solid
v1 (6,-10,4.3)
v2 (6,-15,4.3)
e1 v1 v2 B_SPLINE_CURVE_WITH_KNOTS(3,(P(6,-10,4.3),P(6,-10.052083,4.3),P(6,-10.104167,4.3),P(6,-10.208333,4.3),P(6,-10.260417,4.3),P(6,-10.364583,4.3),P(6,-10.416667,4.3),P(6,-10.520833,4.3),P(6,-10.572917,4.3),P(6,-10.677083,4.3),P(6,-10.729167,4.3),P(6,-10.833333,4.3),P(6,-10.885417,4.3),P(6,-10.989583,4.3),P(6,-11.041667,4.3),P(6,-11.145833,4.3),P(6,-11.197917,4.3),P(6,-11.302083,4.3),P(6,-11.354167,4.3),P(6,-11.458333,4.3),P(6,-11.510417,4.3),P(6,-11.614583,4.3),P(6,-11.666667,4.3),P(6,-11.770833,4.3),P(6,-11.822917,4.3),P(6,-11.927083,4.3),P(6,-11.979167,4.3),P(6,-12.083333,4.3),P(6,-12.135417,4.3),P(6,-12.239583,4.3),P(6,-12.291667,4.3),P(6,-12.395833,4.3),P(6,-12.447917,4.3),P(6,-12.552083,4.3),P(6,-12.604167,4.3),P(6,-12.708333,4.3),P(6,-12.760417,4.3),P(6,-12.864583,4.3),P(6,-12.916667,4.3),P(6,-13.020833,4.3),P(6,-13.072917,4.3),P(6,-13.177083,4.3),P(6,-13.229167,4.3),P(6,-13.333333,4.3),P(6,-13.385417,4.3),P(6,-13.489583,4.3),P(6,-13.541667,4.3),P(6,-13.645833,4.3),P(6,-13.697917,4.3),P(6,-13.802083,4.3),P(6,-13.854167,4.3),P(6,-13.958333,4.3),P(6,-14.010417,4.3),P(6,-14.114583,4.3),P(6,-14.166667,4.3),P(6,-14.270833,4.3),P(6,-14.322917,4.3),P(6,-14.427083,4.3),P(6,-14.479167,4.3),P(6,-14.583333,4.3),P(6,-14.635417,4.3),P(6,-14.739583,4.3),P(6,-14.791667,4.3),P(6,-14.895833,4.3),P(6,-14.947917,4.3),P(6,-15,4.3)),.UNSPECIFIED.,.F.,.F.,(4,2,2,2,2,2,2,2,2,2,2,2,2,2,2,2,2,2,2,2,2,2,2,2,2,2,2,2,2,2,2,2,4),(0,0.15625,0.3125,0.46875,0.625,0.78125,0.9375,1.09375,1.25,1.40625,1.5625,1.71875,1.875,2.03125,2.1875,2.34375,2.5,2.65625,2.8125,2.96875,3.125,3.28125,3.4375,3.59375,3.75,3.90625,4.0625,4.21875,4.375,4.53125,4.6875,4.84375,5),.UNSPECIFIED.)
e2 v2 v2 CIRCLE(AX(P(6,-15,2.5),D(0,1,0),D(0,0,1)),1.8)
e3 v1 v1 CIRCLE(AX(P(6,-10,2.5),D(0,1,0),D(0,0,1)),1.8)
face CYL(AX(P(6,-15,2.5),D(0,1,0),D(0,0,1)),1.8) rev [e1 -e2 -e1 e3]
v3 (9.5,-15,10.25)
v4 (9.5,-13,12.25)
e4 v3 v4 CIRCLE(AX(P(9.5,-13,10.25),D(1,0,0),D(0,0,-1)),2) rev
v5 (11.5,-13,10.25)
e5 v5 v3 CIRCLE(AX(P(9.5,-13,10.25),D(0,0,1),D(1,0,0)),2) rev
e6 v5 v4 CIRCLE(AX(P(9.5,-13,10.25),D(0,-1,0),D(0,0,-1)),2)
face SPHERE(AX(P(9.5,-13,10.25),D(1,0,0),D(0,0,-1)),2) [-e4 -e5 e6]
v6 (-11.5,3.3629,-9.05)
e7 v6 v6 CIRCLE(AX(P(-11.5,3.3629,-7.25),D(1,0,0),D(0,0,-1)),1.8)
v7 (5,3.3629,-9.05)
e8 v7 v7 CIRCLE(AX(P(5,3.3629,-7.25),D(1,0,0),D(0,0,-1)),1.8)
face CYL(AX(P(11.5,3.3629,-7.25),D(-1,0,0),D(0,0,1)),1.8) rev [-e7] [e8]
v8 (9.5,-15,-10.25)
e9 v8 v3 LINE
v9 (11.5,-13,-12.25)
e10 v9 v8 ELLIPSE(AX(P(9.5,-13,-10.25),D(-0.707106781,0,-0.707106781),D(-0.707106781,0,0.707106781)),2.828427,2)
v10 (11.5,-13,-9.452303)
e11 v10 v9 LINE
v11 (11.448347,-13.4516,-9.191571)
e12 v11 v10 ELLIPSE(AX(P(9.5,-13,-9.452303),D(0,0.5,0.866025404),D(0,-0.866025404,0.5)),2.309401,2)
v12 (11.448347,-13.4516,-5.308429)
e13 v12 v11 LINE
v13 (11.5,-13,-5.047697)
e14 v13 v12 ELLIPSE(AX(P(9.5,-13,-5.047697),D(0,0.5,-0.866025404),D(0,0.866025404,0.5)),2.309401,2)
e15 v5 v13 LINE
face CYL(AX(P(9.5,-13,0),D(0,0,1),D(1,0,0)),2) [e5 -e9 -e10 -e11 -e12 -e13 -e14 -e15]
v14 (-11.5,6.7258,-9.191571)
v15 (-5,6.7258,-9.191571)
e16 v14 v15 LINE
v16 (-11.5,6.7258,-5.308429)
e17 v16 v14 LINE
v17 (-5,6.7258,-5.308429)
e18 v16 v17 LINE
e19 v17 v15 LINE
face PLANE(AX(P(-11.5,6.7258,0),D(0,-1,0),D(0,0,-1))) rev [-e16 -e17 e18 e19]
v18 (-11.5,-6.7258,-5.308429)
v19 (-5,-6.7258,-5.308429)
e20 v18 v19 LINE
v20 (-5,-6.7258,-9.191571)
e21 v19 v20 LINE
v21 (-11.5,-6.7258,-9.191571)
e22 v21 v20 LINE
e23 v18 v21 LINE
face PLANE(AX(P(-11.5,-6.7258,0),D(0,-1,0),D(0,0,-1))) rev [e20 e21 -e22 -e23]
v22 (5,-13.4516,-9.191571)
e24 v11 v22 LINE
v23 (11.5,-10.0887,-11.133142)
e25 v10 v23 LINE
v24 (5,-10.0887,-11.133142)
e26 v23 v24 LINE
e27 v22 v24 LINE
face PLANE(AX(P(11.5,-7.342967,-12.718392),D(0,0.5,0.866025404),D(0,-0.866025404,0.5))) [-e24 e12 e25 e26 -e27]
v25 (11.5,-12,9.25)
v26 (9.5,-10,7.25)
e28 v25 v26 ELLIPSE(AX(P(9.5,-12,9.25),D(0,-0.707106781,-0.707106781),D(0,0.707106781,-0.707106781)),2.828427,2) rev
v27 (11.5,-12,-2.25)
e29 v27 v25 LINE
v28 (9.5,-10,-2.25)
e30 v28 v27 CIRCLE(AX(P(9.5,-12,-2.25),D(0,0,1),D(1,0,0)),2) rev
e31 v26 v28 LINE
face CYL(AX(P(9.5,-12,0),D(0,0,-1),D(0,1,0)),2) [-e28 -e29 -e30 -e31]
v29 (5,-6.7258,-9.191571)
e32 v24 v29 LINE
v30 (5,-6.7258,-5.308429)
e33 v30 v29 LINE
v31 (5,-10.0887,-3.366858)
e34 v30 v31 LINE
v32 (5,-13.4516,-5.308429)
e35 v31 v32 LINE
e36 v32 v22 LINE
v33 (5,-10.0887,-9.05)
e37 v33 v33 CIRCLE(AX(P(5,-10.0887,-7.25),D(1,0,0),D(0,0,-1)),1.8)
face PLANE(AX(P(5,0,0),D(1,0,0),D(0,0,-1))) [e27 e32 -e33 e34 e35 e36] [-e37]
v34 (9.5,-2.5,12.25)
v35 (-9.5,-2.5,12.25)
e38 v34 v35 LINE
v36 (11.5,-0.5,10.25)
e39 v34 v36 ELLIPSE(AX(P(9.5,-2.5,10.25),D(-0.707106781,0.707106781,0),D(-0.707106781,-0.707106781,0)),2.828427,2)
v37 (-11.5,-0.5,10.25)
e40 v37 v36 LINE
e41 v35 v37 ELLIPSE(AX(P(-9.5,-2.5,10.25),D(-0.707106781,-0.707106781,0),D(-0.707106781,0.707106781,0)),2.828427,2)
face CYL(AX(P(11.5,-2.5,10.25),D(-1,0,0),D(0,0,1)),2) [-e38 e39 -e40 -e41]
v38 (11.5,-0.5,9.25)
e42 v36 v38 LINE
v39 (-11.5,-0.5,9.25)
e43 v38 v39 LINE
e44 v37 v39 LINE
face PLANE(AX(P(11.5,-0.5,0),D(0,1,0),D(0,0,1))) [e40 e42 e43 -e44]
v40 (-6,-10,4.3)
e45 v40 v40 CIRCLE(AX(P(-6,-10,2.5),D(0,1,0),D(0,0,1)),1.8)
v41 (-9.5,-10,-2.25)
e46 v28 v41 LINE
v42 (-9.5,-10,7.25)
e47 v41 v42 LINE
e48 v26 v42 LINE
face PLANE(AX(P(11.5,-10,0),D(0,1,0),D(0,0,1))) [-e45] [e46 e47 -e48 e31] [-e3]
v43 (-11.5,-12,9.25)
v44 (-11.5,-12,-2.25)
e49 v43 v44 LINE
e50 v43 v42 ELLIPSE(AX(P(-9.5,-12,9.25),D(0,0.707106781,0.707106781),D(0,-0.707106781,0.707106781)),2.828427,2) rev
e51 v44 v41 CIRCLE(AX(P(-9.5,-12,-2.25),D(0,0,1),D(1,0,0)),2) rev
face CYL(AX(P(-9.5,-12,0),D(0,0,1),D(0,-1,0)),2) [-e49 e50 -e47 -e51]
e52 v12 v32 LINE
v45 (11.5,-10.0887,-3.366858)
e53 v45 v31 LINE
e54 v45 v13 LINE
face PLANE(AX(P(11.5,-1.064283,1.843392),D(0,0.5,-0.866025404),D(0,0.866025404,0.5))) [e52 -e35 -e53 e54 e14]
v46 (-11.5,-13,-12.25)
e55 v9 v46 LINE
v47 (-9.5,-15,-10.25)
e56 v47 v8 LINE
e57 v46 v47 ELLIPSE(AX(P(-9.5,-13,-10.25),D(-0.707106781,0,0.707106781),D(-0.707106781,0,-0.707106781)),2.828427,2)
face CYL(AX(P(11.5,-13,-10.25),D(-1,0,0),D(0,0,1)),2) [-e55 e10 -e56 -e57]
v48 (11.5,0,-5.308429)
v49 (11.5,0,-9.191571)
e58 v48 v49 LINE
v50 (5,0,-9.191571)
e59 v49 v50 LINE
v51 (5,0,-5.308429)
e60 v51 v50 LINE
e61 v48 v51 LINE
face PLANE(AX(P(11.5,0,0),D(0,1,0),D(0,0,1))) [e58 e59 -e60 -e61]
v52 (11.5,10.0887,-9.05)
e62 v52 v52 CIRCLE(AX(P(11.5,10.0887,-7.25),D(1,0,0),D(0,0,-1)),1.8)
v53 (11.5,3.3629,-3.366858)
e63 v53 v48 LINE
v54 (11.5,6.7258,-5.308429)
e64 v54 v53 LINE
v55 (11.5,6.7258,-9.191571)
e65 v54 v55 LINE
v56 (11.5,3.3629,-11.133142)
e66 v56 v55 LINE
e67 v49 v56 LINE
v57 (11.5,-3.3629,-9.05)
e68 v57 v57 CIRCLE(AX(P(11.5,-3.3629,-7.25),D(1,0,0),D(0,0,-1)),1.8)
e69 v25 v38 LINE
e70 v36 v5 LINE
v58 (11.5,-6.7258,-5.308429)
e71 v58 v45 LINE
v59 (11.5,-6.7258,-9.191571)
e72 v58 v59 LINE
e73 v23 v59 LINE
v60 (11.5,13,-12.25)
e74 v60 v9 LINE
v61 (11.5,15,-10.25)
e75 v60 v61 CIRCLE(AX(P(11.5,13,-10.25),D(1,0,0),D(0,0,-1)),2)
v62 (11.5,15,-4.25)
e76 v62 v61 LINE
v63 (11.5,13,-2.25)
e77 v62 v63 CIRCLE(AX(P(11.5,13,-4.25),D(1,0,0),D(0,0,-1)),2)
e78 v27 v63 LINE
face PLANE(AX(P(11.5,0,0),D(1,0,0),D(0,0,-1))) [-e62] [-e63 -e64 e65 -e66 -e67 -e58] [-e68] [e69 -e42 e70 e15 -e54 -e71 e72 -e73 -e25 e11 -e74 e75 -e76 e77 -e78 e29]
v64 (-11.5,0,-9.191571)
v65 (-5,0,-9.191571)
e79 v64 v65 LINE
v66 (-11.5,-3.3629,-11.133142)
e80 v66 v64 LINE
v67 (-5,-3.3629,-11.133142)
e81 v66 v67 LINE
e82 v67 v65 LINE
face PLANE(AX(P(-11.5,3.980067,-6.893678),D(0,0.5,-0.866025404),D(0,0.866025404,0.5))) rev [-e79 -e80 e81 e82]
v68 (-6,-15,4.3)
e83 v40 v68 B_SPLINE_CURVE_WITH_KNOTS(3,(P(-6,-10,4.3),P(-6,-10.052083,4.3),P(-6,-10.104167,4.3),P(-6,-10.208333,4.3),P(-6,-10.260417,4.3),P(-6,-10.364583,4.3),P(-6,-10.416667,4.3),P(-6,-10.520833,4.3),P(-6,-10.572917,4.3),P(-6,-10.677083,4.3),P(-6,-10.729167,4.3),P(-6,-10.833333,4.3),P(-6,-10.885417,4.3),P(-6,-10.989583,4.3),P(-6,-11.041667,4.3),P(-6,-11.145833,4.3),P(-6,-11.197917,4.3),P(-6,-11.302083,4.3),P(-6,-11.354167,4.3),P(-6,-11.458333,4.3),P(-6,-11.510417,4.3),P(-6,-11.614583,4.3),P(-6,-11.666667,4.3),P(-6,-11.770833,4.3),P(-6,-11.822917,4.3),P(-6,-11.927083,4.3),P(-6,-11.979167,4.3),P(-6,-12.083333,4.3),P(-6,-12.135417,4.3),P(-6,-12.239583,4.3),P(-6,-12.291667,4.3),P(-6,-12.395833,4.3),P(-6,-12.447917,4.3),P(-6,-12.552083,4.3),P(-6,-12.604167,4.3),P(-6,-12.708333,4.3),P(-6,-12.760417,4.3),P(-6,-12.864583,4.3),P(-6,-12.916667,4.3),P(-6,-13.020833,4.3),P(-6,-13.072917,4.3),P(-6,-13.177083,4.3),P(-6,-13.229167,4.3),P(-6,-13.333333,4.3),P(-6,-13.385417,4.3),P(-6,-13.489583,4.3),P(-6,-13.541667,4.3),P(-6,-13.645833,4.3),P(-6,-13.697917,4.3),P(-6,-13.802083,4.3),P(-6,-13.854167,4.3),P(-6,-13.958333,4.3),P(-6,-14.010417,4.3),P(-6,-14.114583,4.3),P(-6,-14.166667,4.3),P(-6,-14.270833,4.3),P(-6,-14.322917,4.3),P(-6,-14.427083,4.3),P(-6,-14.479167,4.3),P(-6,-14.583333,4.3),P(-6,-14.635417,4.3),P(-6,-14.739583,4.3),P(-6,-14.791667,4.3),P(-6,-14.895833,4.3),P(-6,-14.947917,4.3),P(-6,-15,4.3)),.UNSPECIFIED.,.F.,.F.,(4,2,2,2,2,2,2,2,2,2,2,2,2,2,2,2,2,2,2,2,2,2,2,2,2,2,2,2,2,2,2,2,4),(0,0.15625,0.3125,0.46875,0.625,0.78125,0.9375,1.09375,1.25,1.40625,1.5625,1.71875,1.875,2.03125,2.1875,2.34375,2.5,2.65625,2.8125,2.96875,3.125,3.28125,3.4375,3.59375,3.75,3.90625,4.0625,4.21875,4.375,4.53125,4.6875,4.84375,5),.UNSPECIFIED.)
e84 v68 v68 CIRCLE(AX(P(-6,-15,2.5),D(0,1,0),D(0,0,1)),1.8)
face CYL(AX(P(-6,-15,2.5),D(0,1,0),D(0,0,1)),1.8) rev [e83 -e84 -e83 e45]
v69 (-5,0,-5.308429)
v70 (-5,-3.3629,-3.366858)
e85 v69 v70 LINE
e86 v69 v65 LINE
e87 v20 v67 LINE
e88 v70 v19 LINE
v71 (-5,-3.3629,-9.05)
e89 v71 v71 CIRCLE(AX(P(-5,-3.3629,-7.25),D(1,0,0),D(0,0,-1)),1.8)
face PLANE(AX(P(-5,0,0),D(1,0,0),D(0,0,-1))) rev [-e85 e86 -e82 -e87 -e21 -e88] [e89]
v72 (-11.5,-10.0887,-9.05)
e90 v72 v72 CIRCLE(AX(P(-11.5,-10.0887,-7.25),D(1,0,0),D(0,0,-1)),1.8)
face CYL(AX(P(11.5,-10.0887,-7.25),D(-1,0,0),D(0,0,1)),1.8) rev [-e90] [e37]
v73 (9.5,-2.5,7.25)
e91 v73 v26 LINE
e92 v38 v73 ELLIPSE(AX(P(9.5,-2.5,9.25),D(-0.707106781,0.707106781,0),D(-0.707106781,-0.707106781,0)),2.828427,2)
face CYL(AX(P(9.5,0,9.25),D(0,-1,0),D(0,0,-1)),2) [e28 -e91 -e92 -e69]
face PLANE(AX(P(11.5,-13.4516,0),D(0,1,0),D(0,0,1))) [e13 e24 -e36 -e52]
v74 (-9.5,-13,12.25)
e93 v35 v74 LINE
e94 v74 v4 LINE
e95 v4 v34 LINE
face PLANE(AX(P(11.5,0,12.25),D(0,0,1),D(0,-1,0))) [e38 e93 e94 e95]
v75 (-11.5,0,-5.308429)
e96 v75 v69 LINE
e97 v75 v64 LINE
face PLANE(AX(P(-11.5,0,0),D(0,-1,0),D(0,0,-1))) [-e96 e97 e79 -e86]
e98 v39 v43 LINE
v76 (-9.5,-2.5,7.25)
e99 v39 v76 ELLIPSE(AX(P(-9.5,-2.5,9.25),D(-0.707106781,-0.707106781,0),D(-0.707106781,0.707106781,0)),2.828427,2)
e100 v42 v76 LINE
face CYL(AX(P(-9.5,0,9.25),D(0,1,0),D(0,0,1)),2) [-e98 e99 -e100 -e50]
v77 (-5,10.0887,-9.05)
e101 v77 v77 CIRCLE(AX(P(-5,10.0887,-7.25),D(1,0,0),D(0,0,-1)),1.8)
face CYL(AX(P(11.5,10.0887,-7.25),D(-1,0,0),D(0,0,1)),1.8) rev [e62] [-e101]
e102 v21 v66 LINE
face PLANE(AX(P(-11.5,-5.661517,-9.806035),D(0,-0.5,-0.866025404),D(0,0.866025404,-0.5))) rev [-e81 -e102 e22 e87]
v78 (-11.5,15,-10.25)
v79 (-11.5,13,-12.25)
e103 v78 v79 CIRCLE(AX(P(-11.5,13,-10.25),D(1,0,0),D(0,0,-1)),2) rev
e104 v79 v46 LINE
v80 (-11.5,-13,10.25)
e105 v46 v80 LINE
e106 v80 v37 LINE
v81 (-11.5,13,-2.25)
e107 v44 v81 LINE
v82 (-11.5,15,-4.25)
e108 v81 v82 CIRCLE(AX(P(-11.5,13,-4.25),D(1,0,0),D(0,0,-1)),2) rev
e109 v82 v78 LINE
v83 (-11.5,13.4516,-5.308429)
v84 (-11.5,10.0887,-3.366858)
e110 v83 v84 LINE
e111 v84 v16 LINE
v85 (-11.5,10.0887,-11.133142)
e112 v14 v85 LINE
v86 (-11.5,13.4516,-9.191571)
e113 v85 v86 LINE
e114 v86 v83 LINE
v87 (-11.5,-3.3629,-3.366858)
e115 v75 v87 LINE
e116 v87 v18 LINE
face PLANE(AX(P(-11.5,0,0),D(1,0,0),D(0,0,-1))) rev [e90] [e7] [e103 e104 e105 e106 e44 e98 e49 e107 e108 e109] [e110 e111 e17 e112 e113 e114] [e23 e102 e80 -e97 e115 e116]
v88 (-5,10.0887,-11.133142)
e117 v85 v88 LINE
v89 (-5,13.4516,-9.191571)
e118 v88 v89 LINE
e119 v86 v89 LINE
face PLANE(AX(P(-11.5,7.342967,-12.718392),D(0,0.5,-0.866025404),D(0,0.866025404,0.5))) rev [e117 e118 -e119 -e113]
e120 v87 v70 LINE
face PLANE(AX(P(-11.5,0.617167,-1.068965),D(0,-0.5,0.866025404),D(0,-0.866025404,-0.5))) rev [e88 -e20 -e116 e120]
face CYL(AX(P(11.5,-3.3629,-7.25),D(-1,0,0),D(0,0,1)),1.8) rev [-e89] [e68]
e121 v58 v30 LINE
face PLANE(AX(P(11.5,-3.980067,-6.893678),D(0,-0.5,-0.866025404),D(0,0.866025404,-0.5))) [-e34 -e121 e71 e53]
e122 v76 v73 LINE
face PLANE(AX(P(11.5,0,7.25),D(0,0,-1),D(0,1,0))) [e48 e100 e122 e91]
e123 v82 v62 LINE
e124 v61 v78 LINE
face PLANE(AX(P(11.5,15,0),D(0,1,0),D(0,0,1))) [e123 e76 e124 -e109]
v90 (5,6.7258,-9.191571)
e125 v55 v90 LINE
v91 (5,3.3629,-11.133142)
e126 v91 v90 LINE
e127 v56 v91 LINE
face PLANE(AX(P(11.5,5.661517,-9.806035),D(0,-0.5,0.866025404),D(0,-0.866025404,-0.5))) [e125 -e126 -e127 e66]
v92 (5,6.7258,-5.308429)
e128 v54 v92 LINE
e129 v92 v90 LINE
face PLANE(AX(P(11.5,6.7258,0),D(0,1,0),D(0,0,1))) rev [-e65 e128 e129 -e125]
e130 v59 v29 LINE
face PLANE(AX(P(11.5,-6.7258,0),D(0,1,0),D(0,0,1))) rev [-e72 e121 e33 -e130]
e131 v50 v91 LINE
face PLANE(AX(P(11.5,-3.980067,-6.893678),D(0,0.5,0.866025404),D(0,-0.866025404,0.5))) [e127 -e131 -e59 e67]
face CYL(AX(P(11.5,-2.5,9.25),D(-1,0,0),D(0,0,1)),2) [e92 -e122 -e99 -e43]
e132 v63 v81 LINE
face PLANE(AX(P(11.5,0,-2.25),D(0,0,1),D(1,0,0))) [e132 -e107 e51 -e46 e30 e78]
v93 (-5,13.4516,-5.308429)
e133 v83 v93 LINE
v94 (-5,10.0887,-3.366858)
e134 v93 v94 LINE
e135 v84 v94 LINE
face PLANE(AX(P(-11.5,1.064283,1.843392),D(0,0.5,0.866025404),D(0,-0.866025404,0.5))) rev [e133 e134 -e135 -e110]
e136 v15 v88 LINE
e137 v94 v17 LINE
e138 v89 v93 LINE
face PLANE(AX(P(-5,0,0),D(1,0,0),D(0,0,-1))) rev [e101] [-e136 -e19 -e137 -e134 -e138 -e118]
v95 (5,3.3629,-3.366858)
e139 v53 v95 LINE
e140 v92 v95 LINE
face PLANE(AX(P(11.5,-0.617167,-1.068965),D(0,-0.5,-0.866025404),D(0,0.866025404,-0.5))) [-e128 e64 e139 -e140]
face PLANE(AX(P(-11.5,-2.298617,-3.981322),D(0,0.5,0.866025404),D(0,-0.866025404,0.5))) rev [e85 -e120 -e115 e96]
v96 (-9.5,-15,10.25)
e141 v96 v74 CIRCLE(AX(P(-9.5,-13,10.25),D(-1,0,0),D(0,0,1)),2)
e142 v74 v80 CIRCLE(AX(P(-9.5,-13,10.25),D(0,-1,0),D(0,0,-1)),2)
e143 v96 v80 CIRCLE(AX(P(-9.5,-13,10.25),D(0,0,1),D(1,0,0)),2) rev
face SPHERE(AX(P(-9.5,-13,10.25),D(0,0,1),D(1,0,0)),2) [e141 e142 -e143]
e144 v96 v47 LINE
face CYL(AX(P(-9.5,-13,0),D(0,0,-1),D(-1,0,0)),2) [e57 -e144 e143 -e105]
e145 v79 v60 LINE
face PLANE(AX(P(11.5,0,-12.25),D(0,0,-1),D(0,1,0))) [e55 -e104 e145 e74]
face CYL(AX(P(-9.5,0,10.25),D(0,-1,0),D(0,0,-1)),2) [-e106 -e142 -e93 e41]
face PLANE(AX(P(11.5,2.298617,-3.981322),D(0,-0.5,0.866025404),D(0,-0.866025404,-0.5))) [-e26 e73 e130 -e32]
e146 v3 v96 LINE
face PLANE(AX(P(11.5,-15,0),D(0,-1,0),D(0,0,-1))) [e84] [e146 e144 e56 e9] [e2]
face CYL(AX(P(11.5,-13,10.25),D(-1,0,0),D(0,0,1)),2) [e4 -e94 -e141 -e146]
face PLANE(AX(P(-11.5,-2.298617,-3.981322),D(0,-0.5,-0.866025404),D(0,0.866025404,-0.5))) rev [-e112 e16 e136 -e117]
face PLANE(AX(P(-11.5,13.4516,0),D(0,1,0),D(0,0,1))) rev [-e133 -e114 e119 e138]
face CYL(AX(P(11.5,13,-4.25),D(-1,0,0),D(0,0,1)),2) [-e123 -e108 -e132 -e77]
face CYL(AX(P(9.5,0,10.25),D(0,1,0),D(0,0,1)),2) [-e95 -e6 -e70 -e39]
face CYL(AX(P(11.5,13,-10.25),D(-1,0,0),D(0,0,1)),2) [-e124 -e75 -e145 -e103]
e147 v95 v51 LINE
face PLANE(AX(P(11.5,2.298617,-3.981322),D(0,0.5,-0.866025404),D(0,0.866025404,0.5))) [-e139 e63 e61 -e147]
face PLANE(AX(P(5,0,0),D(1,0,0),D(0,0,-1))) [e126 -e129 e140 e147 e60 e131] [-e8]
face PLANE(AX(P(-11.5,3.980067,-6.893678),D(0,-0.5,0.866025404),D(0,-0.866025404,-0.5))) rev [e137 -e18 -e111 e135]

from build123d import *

# Parameters (mm, degrees)
SKETCH1_R               = 1.8
BOSS_EXTRUDE1_DEPTH     = 11.5
CUT_EXTRUDE1_START      = -5
SKETCH1_3_R             = 1.8
CUT_EXTRUDE1_DEPTH      = 18.523598736
CUT_EXTRUDE2_START      = 5
SKETCH1_4_R             = 1.8
CUT_EXTRUDE2_DEPTH      = 18.523598736
CUT_EXTRUDE3_DEPTH      = 23.523598736
CUT_EXTRUDE3_DEPTH_BACK = 23.523598736
SKETCH2_R               = 1.8
FILLET1_R               = 2


with BuildPart() as part:
    # Sketch1 → Boss-Extrude1 (new, symmetric)
    with BuildSketch(Plane(origin=(0, 0, 0), x_dir=(0, 0, -1), z_dir=(1, 0, 0))):
        Polygon((-12.25, -0.5), (-7.25, -0.5), (-7.25, -10), (2.25, -10), (2.25, 15), (12.25, 15), (12.25, -15), (-12.25, -15), align=None)
        with Locations((7.25, 10.0887)):
            Circle(SKETCH1_R, mode=Mode.SUBTRACT)
        with Locations((7.25, 3.3629)):
            Circle(SKETCH1_R, mode=Mode.SUBTRACT)
        with Locations((7.25, -3.3629)):
            Circle(SKETCH1_R, mode=Mode.SUBTRACT)
        with Locations((7.25, -10.0887)):
            Circle(SKETCH1_R, mode=Mode.SUBTRACT)
    extrude(amount=BOSS_EXTRUDE1_DEPTH, both=True)

    # Sketch1<3> → Cut-Extrude1 (cut, through all)
    # profile 1 of 2: a face of its own
    with BuildSketch(Plane(origin=(0, 0, 0), x_dir=(0, 0, -1), z_dir=(1, 0, 0)).offset(CUT_EXTRUDE1_START)):
        Polygon((9.19157122, 13.4516), (5.30842878, 13.4516), (3.366857559, 10.0887), (5.30842878, 6.7258), (9.19157122, 6.7258), (11.133142441, 10.0887), align=None)
        with Locations((7.25, 10.0887)):
            Circle(SKETCH1_3_R, mode=Mode.SUBTRACT)
    # profile 2 of 2: a face of its own
    with BuildSketch(Plane(origin=(0, 0, 0), x_dir=(0, 0, -1), z_dir=(1, 0, 0)).offset(CUT_EXTRUDE1_START)):
        Polygon((5.30842878, 0), (9.19157122, 0), (11.133142441, -3.3629), (9.19157122, -6.7258), (5.30842878, -6.7258), (3.366857559, -3.3629), align=None)
        with Locations((7.25, -3.3629)):
            Circle(SKETCH1_3_R, mode=Mode.SUBTRACT)
    extrude(amount=-CUT_EXTRUDE1_DEPTH, mode=Mode.SUBTRACT)

    # Sketch1<4> → Cut-Extrude2 (cut, through all)
    # profile 1 of 2: a face of its own
    with BuildSketch(Plane(origin=(0, 0, 0), x_dir=(0, 0, -1), z_dir=(1, 0, 0)).offset(CUT_EXTRUDE2_START)):
        Polygon((5.30842878, 6.7258), (9.19157122, 6.7258), (11.133142441, 3.3629), (9.19157122, 0), (5.30842878, 0), (3.366857559, 3.3629), align=None)
        with Locations((7.25, 3.3629)):
            Circle(SKETCH1_4_R, mode=Mode.SUBTRACT)
    # profile 2 of 2: a face of its own
    with BuildSketch(Plane(origin=(0, 0, 0), x_dir=(0, 0, -1), z_dir=(1, 0, 0)).offset(CUT_EXTRUDE2_START)):
        Polygon((5.30842878, -6.7258), (9.19157122, -6.7258), (11.133142441, -10.0887), (9.19157122, -13.4516), (5.30842878, -13.4516), (3.366857559, -10.0887), align=None)
        with Locations((7.25, -10.0887)):
            Circle(SKETCH1_4_R, mode=Mode.SUBTRACT)
    extrude(amount=CUT_EXTRUDE2_DEPTH, mode=Mode.SUBTRACT)

    # Sketch2 → Cut-Extrude3 (cut, two sides: drawn at the far end of the back side and taken through both)
    with BuildSketch(Plane(origin=(0, 0, 0), x_dir=(1, 0, 0), z_dir=(0, 1, 0)).offset(-CUT_EXTRUDE3_DEPTH_BACK)):
        with Locations(Location((-6, -2.5, 0), (0, 0, 270))):
            Circle(SKETCH2_R)
        with Locations(Location((6, -2.5, 0), (0, 0, 270))):
            Circle(SKETCH2_R)
    extrude(amount=CUT_EXTRUDE3_DEPTH + CUT_EXTRUDE3_DEPTH_BACK, mode=Mode.SUBTRACT)

    # Fillet1
    # the kernel refuses this fillet: 2 mm, written as the material it takes off along each edge
    with BuildSketch(Plane(origin=(-9.5, -13, 10.25), x_dir=(-1, 0, 0), z_dir=(0, 0, 1))) as fillet1_piece_1_section:
        Polygon((0, 0), (FILLET1_R * 1.02, 0), (FILLET1_R * 1.02, FILLET1_R * 1.02), (0, FILLET1_R * 1.02), align=None)
    fillet1_piece_1 = extrude(amount=FILLET1_R * 1.02, mode=Mode.PRIVATE)
    fillet1_piece_1 = fillet1_piece_1 - Plane(origin=(-9.5, -13, 10.25), x_dir=(0.7071067811865475, 0.7071067811865475, 0), z_dir=(0, 0, 1)) * Sphere(FILLET1_R, mode=Mode.PRIVATE)
    add(fillet1_piece_1, mode=Mode.SUBTRACT)
    with BuildSketch(Plane(origin=(9.5, -13, 10.25), x_dir=(1, 0, 0), z_dir=(0, 0, 1))) as fillet1_piece_2_section:
        Polygon((0, 0), (FILLET1_R * 1.02, 0), (FILLET1_R * 1.02, -FILLET1_R * 1.02), (0, -FILLET1_R * 1.02), align=None)
    fillet1_piece_2 = extrude(amount=FILLET1_R * 1.02, mode=Mode.PRIVATE)
    fillet1_piece_2 = fillet1_piece_2 - Plane(origin=(9.5, -13, 10.25), x_dir=(-0.7071067811865475, 0.7071067811865475, 0), z_dir=(0, 0, 1)) * Sphere(FILLET1_R, mode=Mode.PRIVATE)
    add(fillet1_piece_2, mode=Mode.SUBTRACT)
    with BuildSketch(Plane(origin=(-11.5, -10, 7.25), x_dir=(0, -1, 0), z_dir=(0, 0, -1)), Plane(origin=(-11.5, -0.5, 7.25), x_dir=(0, 0, 1), z_dir=(0, -1, 0)), Plane(origin=(11.5, -0.5, 7.25), x_dir=(-1, 0, 0), z_dir=(0, -1, 0))) as fillet1_piece_3:
        with BuildLine():
            CenterArc((FILLET1_R, -FILLET1_R), FILLET1_R, 90, 90)
            Line((0, -FILLET1_R), (-FILLET1_R * 0.02, -FILLET1_R))
            Line((-FILLET1_R * 0.02, -FILLET1_R), (-FILLET1_R * 0.02, FILLET1_R * 0.02))
            Line((-FILLET1_R * 0.02, FILLET1_R * 0.02), (FILLET1_R, FILLET1_R * 0.02))
            Line((FILLET1_R, FILLET1_R * 0.02), (FILLET1_R, 0))
        make_face()
    extrude(amount=9.5, mode=Mode.SUBTRACT)
    with BuildSketch(Plane(origin=(11.5, -10, 7.25), x_dir=(0, -1, 0), z_dir=(0, 0, -1))) as fillet1_piece_4:
        with BuildLine():
            CenterArc((FILLET1_R, FILLET1_R), FILLET1_R, 180, 90)
            Line((0, FILLET1_R), (-FILLET1_R * 0.02, FILLET1_R))
            Line((-FILLET1_R * 0.02, FILLET1_R), (-FILLET1_R * 0.02, -FILLET1_R * 0.02))
            Line((-FILLET1_R * 0.02, -FILLET1_R * 0.02), (FILLET1_R, -FILLET1_R * 0.02))
            Line((FILLET1_R, -FILLET1_R * 0.02), (FILLET1_R, 0))
        make_face()
    extrude(amount=9.5, mode=Mode.SUBTRACT)
    with BuildSketch(Plane(origin=(-11.5, -15, -12.25), x_dir=(0, 1, 0), z_dir=(0, 0, 1))) as fillet1_piece_5:
        with BuildLine():
            CenterArc((FILLET1_R, -FILLET1_R), FILLET1_R, 90, 90)
            Line((0, -FILLET1_R), (-FILLET1_R * 0.02, -FILLET1_R))
            Line((-FILLET1_R * 0.02, -FILLET1_R), (-FILLET1_R * 0.02, FILLET1_R * 0.02))
            Line((-FILLET1_R * 0.02, FILLET1_R * 0.02), (FILLET1_R, FILLET1_R * 0.02))
            Line((FILLET1_R, FILLET1_R * 0.02), (FILLET1_R, 0))
        make_face()
    extrude(amount=22.5, mode=Mode.SUBTRACT)
    with BuildSketch(Plane(origin=(11.5, -15, -12.25), x_dir=(0, 1, 0), z_dir=(0, 0, 1))) as fillet1_piece_6:
        with BuildLine():
            CenterArc((FILLET1_R, FILLET1_R), FILLET1_R, 180, 90)
            Line((0, FILLET1_R), (-FILLET1_R * 0.02, FILLET1_R))
            Line((-FILLET1_R * 0.02, FILLET1_R), (-FILLET1_R * 0.02, -FILLET1_R * 0.02))
            Line((-FILLET1_R * 0.02, -FILLET1_R * 0.02), (FILLET1_R, -FILLET1_R * 0.02))
            Line((FILLET1_R, -FILLET1_R * 0.02), (FILLET1_R, 0))
        make_face()
    extrude(amount=22.5, mode=Mode.SUBTRACT)
    with BuildSketch(Plane(origin=(-11.5, -13, 12.25), x_dir=(1, 0, 0), z_dir=(0, 1, 0))) as fillet1_piece_7:
        with BuildLine():
            CenterArc((FILLET1_R, FILLET1_R), FILLET1_R, 180, 90)
            Line((0, FILLET1_R), (-FILLET1_R * 0.02, FILLET1_R))
            Line((-FILLET1_R * 0.02, FILLET1_R), (-FILLET1_R * 0.02, -FILLET1_R * 0.02))
            Line((-FILLET1_R * 0.02, -FILLET1_R * 0.02), (FILLET1_R, -FILLET1_R * 0.02))
            Line((FILLET1_R, -FILLET1_R * 0.02), (FILLET1_R, 0))
        make_face()
    extrude(amount=12.5, mode=Mode.SUBTRACT)
    with BuildSketch(Plane(origin=(11.5, -13, 12.25), x_dir=(-1, 0, 0), z_dir=(0, 1, 0))) as fillet1_piece_8:
        with BuildLine():
            CenterArc((FILLET1_R, -FILLET1_R), FILLET1_R, 90, 90)
            Line((0, -FILLET1_R), (-FILLET1_R * 0.02, -FILLET1_R))
            Line((-FILLET1_R * 0.02, -FILLET1_R), (-FILLET1_R * 0.02, FILLET1_R * 0.02))
            Line((-FILLET1_R * 0.02, FILLET1_R * 0.02), (FILLET1_R, FILLET1_R * 0.02))
            Line((FILLET1_R, FILLET1_R * 0.02), (FILLET1_R, 0))
        make_face()
    extrude(amount=12.5, mode=Mode.SUBTRACT)
    with BuildSketch(Plane(origin=(11.5, 15, -2.25), x_dir=(0, -1, 0), z_dir=(-1, 0, 0)), Plane(origin=(-11.5, -15, -12.25), x_dir=(0, 0, 1), z_dir=(1, 0, 0)), Plane(origin=(11.5, -0.5, 7.25), x_dir=(0, 0, 1), z_dir=(-1, 0, 0)), Plane(origin=(-11.5, -0.5, 12.25), x_dir=(0, 0, -1), z_dir=(1, 0, 0))) as fillet1_piece_9:
        with BuildLine():
            CenterArc((FILLET1_R, -FILLET1_R), FILLET1_R, 90, 90)
            Line((0, -FILLET1_R), (-FILLET1_R * 0.02, -FILLET1_R))
            Line((-FILLET1_R * 0.02, -FILLET1_R), (-FILLET1_R * 0.02, FILLET1_R * 0.02))
            Line((-FILLET1_R * 0.02, FILLET1_R * 0.02), (FILLET1_R, FILLET1_R * 0.02))
            Line((FILLET1_R, FILLET1_R * 0.02), (FILLET1_R, 0))
        make_face()
    extrude(amount=23, mode=Mode.SUBTRACT)
    with BuildSketch(Plane(origin=(11.5, 15, -12.25), x_dir=(0, -1, 0), z_dir=(-1, 0, 0))) as fillet1_piece_10:
        with BuildLine():
            CenterArc((FILLET1_R, FILLET1_R), FILLET1_R, 180, 90)
            Line((0, FILLET1_R), (-FILLET1_R * 0.02, FILLET1_R))
            Line((-FILLET1_R * 0.02, FILLET1_R), (-FILLET1_R * 0.02, -FILLET1_R * 0.02))
            Line((-FILLET1_R * 0.02, -FILLET1_R * 0.02), (FILLET1_R, -FILLET1_R * 0.02))
            Line((FILLET1_R, -FILLET1_R * 0.02), (FILLET1_R, 0))
        make_face()
    extrude(amount=23, mode=Mode.SUBTRACT)
    with BuildSketch(Plane(origin=(-9.5, -15, 12.25), x_dir=(0, 1, 0), z_dir=(1, 0, 0))) as fillet1_piece_11:
        with BuildLine():
            CenterArc((FILLET1_R, -FILLET1_R), FILLET1_R, 90, 90)
            Line((0, -FILLET1_R), (-FILLET1_R * 0.02, -FILLET1_R))
            Line((-FILLET1_R * 0.02, -FILLET1_R), (-FILLET1_R * 0.02, FILLET1_R * 0.02))
            Line((-FILLET1_R * 0.02, FILLET1_R * 0.02), (FILLET1_R, FILLET1_R * 0.02))
            Line((FILLET1_R, FILLET1_R * 0.02), (FILLET1_R, 0))
        make_face()
    extrude(amount=19, mode=Mode.SUBTRACT)
    with BuildSketch(Plane(origin=(-11.5, -0.5, 7.25), x_dir=(0, 0, 1), z_dir=(0, -1, 0))) as fillet1_piece_12a_section:
        with BuildLine():
            CenterArc((FILLET1_R, -FILLET1_R), FILLET1_R, 90, 90)
            Line((0, -FILLET1_R), (-FILLET1_R * 0.02, -FILLET1_R))
            Line((-FILLET1_R * 0.02, -FILLET1_R), (-FILLET1_R * 0.02, FILLET1_R * 0.02))
            Line((-FILLET1_R * 0.02, FILLET1_R * 0.02), (FILLET1_R, FILLET1_R * 0.02))
            Line((FILLET1_R, FILLET1_R * 0.02), (FILLET1_R, 0))
        make_face()
    fillet1_piece_12a = extrude(amount=14.5, mode=Mode.PRIVATE)
    fillet1_piece_12a = split(fillet1_piece_12a, bisect_by=Plane(origin=(-11.047209771, -10, 7.702790229), z_dir=(0, -1, 0)), keep=Keep.TOP, mode=Mode.PRIVATE)
    with BuildSketch(Plane(origin=(-11.5, -10, 12.25), x_dir=(0, -1, 0), z_dir=(0, 0, -1))) as fillet1_piece_12b_section:
        with BuildLine():
            CenterArc((FILLET1_R, -FILLET1_R), FILLET1_R, 90, 90)
            Line((0, -FILLET1_R), (-FILLET1_R * 0.02, -FILLET1_R))
            Line((-FILLET1_R * 0.02, -FILLET1_R), (-FILLET1_R * 0.02, FILLET1_R * 0.02))
            Line((-FILLET1_R * 0.02, FILLET1_R * 0.02), (FILLET1_R, FILLET1_R * 0.02))
            Line((FILLET1_R, FILLET1_R * 0.02), (FILLET1_R, 0))
        make_face()
    fillet1_piece_12b = extrude(amount=14.5, mode=Mode.PRIVATE)
    fillet1_piece_12b = split(fillet1_piece_12b, bisect_by=Plane(origin=(-11.047209771, -10.452790229, 7.25), z_dir=(0, 0, 1)), keep=Keep.TOP, mode=Mode.PRIVATE)
    fillet1_piece_12 = fillet1_piece_12a & fillet1_piece_12b
    add(fillet1_piece_12, mode=Mode.SUBTRACT)
    with BuildSketch(Plane(origin=(11.5, -0.5, 7.25), x_dir=(-1, 0, 0), z_dir=(0, -1, 0))) as fillet1_piece_13a_section:
        with BuildLine():
            CenterArc((FILLET1_R, -FILLET1_R), FILLET1_R, 90, 90)
            Line((0, -FILLET1_R), (-FILLET1_R * 0.02, -FILLET1_R))
            Line((-FILLET1_R * 0.02, -FILLET1_R), (-FILLET1_R * 0.02, FILLET1_R * 0.02))
            Line((-FILLET1_R * 0.02, FILLET1_R * 0.02), (FILLET1_R, FILLET1_R * 0.02))
            Line((FILLET1_R, FILLET1_R * 0.02), (FILLET1_R, 0))
        make_face()
    fillet1_piece_13a = extrude(amount=14.5, mode=Mode.PRIVATE)
    fillet1_piece_13a = split(fillet1_piece_13a, bisect_by=Plane(origin=(11.047209771, -10, 7.702790229), z_dir=(0, -1, 0)), keep=Keep.TOP, mode=Mode.PRIVATE)
    with BuildSketch(Plane(origin=(11.5, -10, 12.25), x_dir=(0, -1, 0), z_dir=(0, 0, -1))) as fillet1_piece_13b_section:
        with BuildLine():
            CenterArc((FILLET1_R, FILLET1_R), FILLET1_R, 180, 90)
            Line((0, FILLET1_R), (-FILLET1_R * 0.02, FILLET1_R))
            Line((-FILLET1_R * 0.02, FILLET1_R), (-FILLET1_R * 0.02, -FILLET1_R * 0.02))
            Line((-FILLET1_R * 0.02, -FILLET1_R * 0.02), (FILLET1_R, -FILLET1_R * 0.02))
            Line((FILLET1_R, -FILLET1_R * 0.02), (FILLET1_R, 0))
        make_face()
    fillet1_piece_13b = extrude(amount=14.5, mode=Mode.PRIVATE)
    fillet1_piece_13b = split(fillet1_piece_13b, bisect_by=Plane(origin=(11.047209771, -10.452790229, 7.25), z_dir=(0, 0, 1)), keep=Keep.TOP, mode=Mode.PRIVATE)
    fillet1_piece_13 = fillet1_piece_13a & fillet1_piece_13b
    add(fillet1_piece_13, mode=Mode.SUBTRACT)
    with BuildSketch(Plane(origin=(11.5, -0.5, 7.25), x_dir=(0, 0, 1), z_dir=(-1, 0, 0))) as fillet1_piece_14a_section:
        with BuildLine():
            CenterArc((FILLET1_R, -FILLET1_R), FILLET1_R, 90, 90)
            Line((0, -FILLET1_R), (-FILLET1_R * 0.02, -FILLET1_R))
            Line((-FILLET1_R * 0.02, -FILLET1_R), (-FILLET1_R * 0.02, FILLET1_R * 0.02))
            Line((-FILLET1_R * 0.02, FILLET1_R * 0.02), (FILLET1_R, FILLET1_R * 0.02))
            Line((FILLET1_R, FILLET1_R * 0.02), (FILLET1_R, 0))
        make_face()
    fillet1_piece_14a = extrude(amount=28, mode=Mode.PRIVATE)
    fillet1_piece_14a = split(fillet1_piece_14a, bisect_by=Plane(origin=(-11.5, -0.952790229, 7.702790229), z_dir=(-1, 0, 0)), keep=Keep.TOP, mode=Mode.PRIVATE)
    with BuildSketch(Plane(origin=(-11.5, 4.5, 7.25), x_dir=(0, 0, 1), z_dir=(0, -1, 0))) as fillet1_piece_14b_section:
        with BuildLine():
            CenterArc((FILLET1_R, -FILLET1_R), FILLET1_R, 90, 90)
            Line((0, -FILLET1_R), (-FILLET1_R * 0.02, -FILLET1_R))
            Line((-FILLET1_R * 0.02, -FILLET1_R), (-FILLET1_R * 0.02, FILLET1_R * 0.02))
            Line((-FILLET1_R * 0.02, FILLET1_R * 0.02), (FILLET1_R, FILLET1_R * 0.02))
            Line((FILLET1_R, FILLET1_R * 0.02), (FILLET1_R, 0))
        make_face()
    fillet1_piece_14b = extrude(amount=14.5, mode=Mode.PRIVATE)
    fillet1_piece_14b = split(fillet1_piece_14b, bisect_by=Plane(origin=(-11.047209771, -0.5, 7.702790229), z_dir=(0, 1, 0)), keep=Keep.TOP, mode=Mode.PRIVATE)
    fillet1_piece_14 = fillet1_piece_14a & fillet1_piece_14b
    add(fillet1_piece_14, mode=Mode.SUBTRACT)
    with BuildSketch(Plane(origin=(16.5, -0.5, 7.25), x_dir=(0, 0, 1), z_dir=(-1, 0, 0))) as fillet1_piece_15a_section:
        with BuildLine():
            CenterArc((FILLET1_R, -FILLET1_R), FILLET1_R, 90, 90)
            Line((0, -FILLET1_R), (-FILLET1_R * 0.02, -FILLET1_R))
            Line((-FILLET1_R * 0.02, -FILLET1_R), (-FILLET1_R * 0.02, FILLET1_R * 0.02))
            Line((-FILLET1_R * 0.02, FILLET1_R * 0.02), (FILLET1_R, FILLET1_R * 0.02))
            Line((FILLET1_R, FILLET1_R * 0.02), (FILLET1_R, 0))
        make_face()
    fillet1_piece_15a = extrude(amount=28, mode=Mode.PRIVATE)
    fillet1_piece_15a = split(fillet1_piece_15a, bisect_by=Plane(origin=(11.5, -0.952790229, 7.702790229), z_dir=(1, 0, 0)), keep=Keep.TOP, mode=Mode.PRIVATE)
    with BuildSketch(Plane(origin=(11.5, 4.5, 7.25), x_dir=(-1, 0, 0), z_dir=(0, -1, 0))) as fillet1_piece_15b_section:
        with BuildLine():
            CenterArc((FILLET1_R, -FILLET1_R), FILLET1_R, 90, 90)
            Line((0, -FILLET1_R), (-FILLET1_R * 0.02, -FILLET1_R))
            Line((-FILLET1_R * 0.02, -FILLET1_R), (-FILLET1_R * 0.02, FILLET1_R * 0.02))
            Line((-FILLET1_R * 0.02, FILLET1_R * 0.02), (FILLET1_R, FILLET1_R * 0.02))
            Line((FILLET1_R, FILLET1_R * 0.02), (FILLET1_R, 0))
        make_face()
    fillet1_piece_15b = extrude(amount=14.5, mode=Mode.PRIVATE)
    fillet1_piece_15b = split(fillet1_piece_15b, bisect_by=Plane(origin=(11.047209771, -0.5, 7.702790229), z_dir=(0, 1, 0)), keep=Keep.TOP, mode=Mode.PRIVATE)
    fillet1_piece_15 = fillet1_piece_15a & fillet1_piece_15b
    add(fillet1_piece_15, mode=Mode.SUBTRACT)
    with BuildSketch(Plane(origin=(-11.5, -15, -17.25), x_dir=(0, 1, 0), z_dir=(0, 0, 1))) as fillet1_piece_16a_section:
        with BuildLine():
            CenterArc((FILLET1_R, -FILLET1_R), FILLET1_R, 90, 90)
            Line((0, -FILLET1_R), (-FILLET1_R * 0.02, -FILLET1_R))
            Line((-FILLET1_R * 0.02, -FILLET1_R), (-FILLET1_R * 0.02, FILLET1_R * 0.02))
            Line((-FILLET1_R * 0.02, FILLET1_R * 0.02), (FILLET1_R, FILLET1_R * 0.02))
            Line((FILLET1_R, FILLET1_R * 0.02), (FILLET1_R, 0))
        make_face()
    fillet1_piece_16a = extrude(amount=27.5, mode=Mode.PRIVATE)
    fillet1_piece_16a = split(fillet1_piece_16a, bisect_by=Plane(origin=(-11.047209771, -14.547209771, -12.25), z_dir=(0, 0, -1)), keep=Keep.TOP, mode=Mode.PRIVATE)
    with BuildSketch(Plane(origin=(-16.5, -15, -12.25), x_dir=(0, 0, 1), z_dir=(1, 0, 0))) as fillet1_piece_16b_section:
        with BuildLine():
            CenterArc((FILLET1_R, -FILLET1_R), FILLET1_R, 90, 90)
            Line((0, -FILLET1_R), (-FILLET1_R * 0.02, -FILLET1_R))
            Line((-FILLET1_R * 0.02, -FILLET1_R), (-FILLET1_R * 0.02, FILLET1_R * 0.02))
            Line((-FILLET1_R * 0.02, FILLET1_R * 0.02), (FILLET1_R, FILLET1_R * 0.02))
            Line((FILLET1_R, FILLET1_R * 0.02), (FILLET1_R, 0))
        make_face()
    fillet1_piece_16b = extrude(amount=28, mode=Mode.PRIVATE)
    fillet1_piece_16b = split(fillet1_piece_16b, bisect_by=Plane(origin=(-11.5, -14.547209771, -11.797209771), z_dir=(-1, 0, 0)), keep=Keep.TOP, mode=Mode.PRIVATE)
    fillet1_piece_16 = fillet1_piece_16a & fillet1_piece_16b
    add(fillet1_piece_16, mode=Mode.SUBTRACT)
    with BuildSketch(Plane(origin=(11.5, -15, -17.25), x_dir=(0, 1, 0), z_dir=(0, 0, 1))) as fillet1_piece_17a_section:
        with BuildLine():
            CenterArc((FILLET1_R, FILLET1_R), FILLET1_R, 180, 90)
            Line((0, FILLET1_R), (-FILLET1_R * 0.02, FILLET1_R))
            Line((-FILLET1_R * 0.02, FILLET1_R), (-FILLET1_R * 0.02, -FILLET1_R * 0.02))
            Line((-FILLET1_R * 0.02, -FILLET1_R * 0.02), (FILLET1_R, -FILLET1_R * 0.02))
            Line((FILLET1_R, -FILLET1_R * 0.02), (FILLET1_R, 0))
        make_face()
    fillet1_piece_17a = extrude(amount=27.5, mode=Mode.PRIVATE)
    fillet1_piece_17a = split(fillet1_piece_17a, bisect_by=Plane(origin=(11.047209771, -14.547209771, -12.25), z_dir=(0, 0, -1)), keep=Keep.TOP, mode=Mode.PRIVATE)
    with BuildSketch(Plane(origin=(-11.5, -15, -12.25), x_dir=(0, 0, 1), z_dir=(1, 0, 0))) as fillet1_piece_17b_section:
        with BuildLine():
            CenterArc((FILLET1_R, -FILLET1_R), FILLET1_R, 90, 90)
            Line((0, -FILLET1_R), (-FILLET1_R * 0.02, -FILLET1_R))
            Line((-FILLET1_R * 0.02, -FILLET1_R), (-FILLET1_R * 0.02, FILLET1_R * 0.02))
            Line((-FILLET1_R * 0.02, FILLET1_R * 0.02), (FILLET1_R, FILLET1_R * 0.02))
            Line((FILLET1_R, FILLET1_R * 0.02), (FILLET1_R, 0))
        make_face()
    fillet1_piece_17b = extrude(amount=28, mode=Mode.PRIVATE)
    fillet1_piece_17b = split(fillet1_piece_17b, bisect_by=Plane(origin=(11.5, -14.547209771, -11.797209771), z_dir=(1, 0, 0)), keep=Keep.TOP, mode=Mode.PRIVATE)
    fillet1_piece_17 = fillet1_piece_17a & fillet1_piece_17b
    add(fillet1_piece_17, mode=Mode.SUBTRACT)
    with BuildSketch(Plane(origin=(-16.5, -0.5, 12.25), x_dir=(0, 0, -1), z_dir=(1, 0, 0))) as fillet1_piece_18a_section:
        with BuildLine():
            CenterArc((FILLET1_R, -FILLET1_R), FILLET1_R, 90, 90)
            Line((0, -FILLET1_R), (-FILLET1_R * 0.02, -FILLET1_R))
            Line((-FILLET1_R * 0.02, -FILLET1_R), (-FILLET1_R * 0.02, FILLET1_R * 0.02))
            Line((-FILLET1_R * 0.02, FILLET1_R * 0.02), (FILLET1_R, FILLET1_R * 0.02))
            Line((FILLET1_R, FILLET1_R * 0.02), (FILLET1_R, 0))
        make_face()
    fillet1_piece_18a = extrude(amount=28, mode=Mode.PRIVATE)
    fillet1_piece_18a = split(fillet1_piece_18a, bisect_by=Plane(origin=(-11.5, -0.952790229, 11.797209771), z_dir=(-1, 0, 0)), keep=Keep.TOP, mode=Mode.PRIVATE)
    with BuildSketch(Plane(origin=(-11.5, -13, 12.25), x_dir=(1, 0, 0), z_dir=(0, 1, 0))) as fillet1_piece_18b_section:
        with BuildLine():
            CenterArc((FILLET1_R, FILLET1_R), FILLET1_R, 180, 90)
            Line((0, FILLET1_R), (-FILLET1_R * 0.02, FILLET1_R))
            Line((-FILLET1_R * 0.02, FILLET1_R), (-FILLET1_R * 0.02, -FILLET1_R * 0.02))
            Line((-FILLET1_R * 0.02, -FILLET1_R * 0.02), (FILLET1_R, -FILLET1_R * 0.02))
            Line((FILLET1_R, -FILLET1_R * 0.02), (FILLET1_R, 0))
        make_face()
    fillet1_piece_18b = extrude(amount=17.5, mode=Mode.PRIVATE)
    fillet1_piece_18b = split(fillet1_piece_18b, bisect_by=Plane(origin=(-11.047209771, -0.5, 11.797209771), z_dir=(0, 1, 0)), keep=Keep.TOP, mode=Mode.PRIVATE)
    fillet1_piece_18 = fillet1_piece_18a & fillet1_piece_18b
    add(fillet1_piece_18, mode=Mode.SUBTRACT)
    with BuildSketch(Plane(origin=(-11.5, -0.5, 12.25), x_dir=(0, 0, -1), z_dir=(1, 0, 0))) as fillet1_piece_19a_section:
        with BuildLine():
            CenterArc((FILLET1_R, -FILLET1_R), FILLET1_R, 90, 90)
            Line((0, -FILLET1_R), (-FILLET1_R * 0.02, -FILLET1_R))
            Line((-FILLET1_R * 0.02, -FILLET1_R), (-FILLET1_R * 0.02, FILLET1_R * 0.02))
            Line((-FILLET1_R * 0.02, FILLET1_R * 0.02), (FILLET1_R, FILLET1_R * 0.02))
            Line((FILLET1_R, FILLET1_R * 0.02), (FILLET1_R, 0))
        make_face()
    fillet1_piece_19a = extrude(amount=28, mode=Mode.PRIVATE)
    fillet1_piece_19a = split(fillet1_piece_19a, bisect_by=Plane(origin=(11.5, -0.952790229, 11.797209771), z_dir=(1, 0, 0)), keep=Keep.TOP, mode=Mode.PRIVATE)
    with BuildSketch(Plane(origin=(11.5, -13, 12.25), x_dir=(-1, 0, 0), z_dir=(0, 1, 0))) as fillet1_piece_19b_section:
        with BuildLine():
            CenterArc((FILLET1_R, -FILLET1_R), FILLET1_R, 90, 90)
            Line((0, -FILLET1_R), (-FILLET1_R * 0.02, -FILLET1_R))
            Line((-FILLET1_R * 0.02, -FILLET1_R), (-FILLET1_R * 0.02, FILLET1_R * 0.02))
            Line((-FILLET1_R * 0.02, FILLET1_R * 0.02), (FILLET1_R, FILLET1_R * 0.02))
            Line((FILLET1_R, FILLET1_R * 0.02), (FILLET1_R, 0))
        make_face()
    fillet1_piece_19b = extrude(amount=17.5, mode=Mode.PRIVATE)
    fillet1_piece_19b = split(fillet1_piece_19b, bisect_by=Plane(origin=(11.047209771, -0.5, 11.797209771), z_dir=(0, 1, 0)), keep=Keep.TOP, mode=Mode.PRIVATE)
    fillet1_piece_19 = fillet1_piece_19a & fillet1_piece_19b
    add(fillet1_piece_19, mode=Mode.SUBTRACT)


solid = part.part
